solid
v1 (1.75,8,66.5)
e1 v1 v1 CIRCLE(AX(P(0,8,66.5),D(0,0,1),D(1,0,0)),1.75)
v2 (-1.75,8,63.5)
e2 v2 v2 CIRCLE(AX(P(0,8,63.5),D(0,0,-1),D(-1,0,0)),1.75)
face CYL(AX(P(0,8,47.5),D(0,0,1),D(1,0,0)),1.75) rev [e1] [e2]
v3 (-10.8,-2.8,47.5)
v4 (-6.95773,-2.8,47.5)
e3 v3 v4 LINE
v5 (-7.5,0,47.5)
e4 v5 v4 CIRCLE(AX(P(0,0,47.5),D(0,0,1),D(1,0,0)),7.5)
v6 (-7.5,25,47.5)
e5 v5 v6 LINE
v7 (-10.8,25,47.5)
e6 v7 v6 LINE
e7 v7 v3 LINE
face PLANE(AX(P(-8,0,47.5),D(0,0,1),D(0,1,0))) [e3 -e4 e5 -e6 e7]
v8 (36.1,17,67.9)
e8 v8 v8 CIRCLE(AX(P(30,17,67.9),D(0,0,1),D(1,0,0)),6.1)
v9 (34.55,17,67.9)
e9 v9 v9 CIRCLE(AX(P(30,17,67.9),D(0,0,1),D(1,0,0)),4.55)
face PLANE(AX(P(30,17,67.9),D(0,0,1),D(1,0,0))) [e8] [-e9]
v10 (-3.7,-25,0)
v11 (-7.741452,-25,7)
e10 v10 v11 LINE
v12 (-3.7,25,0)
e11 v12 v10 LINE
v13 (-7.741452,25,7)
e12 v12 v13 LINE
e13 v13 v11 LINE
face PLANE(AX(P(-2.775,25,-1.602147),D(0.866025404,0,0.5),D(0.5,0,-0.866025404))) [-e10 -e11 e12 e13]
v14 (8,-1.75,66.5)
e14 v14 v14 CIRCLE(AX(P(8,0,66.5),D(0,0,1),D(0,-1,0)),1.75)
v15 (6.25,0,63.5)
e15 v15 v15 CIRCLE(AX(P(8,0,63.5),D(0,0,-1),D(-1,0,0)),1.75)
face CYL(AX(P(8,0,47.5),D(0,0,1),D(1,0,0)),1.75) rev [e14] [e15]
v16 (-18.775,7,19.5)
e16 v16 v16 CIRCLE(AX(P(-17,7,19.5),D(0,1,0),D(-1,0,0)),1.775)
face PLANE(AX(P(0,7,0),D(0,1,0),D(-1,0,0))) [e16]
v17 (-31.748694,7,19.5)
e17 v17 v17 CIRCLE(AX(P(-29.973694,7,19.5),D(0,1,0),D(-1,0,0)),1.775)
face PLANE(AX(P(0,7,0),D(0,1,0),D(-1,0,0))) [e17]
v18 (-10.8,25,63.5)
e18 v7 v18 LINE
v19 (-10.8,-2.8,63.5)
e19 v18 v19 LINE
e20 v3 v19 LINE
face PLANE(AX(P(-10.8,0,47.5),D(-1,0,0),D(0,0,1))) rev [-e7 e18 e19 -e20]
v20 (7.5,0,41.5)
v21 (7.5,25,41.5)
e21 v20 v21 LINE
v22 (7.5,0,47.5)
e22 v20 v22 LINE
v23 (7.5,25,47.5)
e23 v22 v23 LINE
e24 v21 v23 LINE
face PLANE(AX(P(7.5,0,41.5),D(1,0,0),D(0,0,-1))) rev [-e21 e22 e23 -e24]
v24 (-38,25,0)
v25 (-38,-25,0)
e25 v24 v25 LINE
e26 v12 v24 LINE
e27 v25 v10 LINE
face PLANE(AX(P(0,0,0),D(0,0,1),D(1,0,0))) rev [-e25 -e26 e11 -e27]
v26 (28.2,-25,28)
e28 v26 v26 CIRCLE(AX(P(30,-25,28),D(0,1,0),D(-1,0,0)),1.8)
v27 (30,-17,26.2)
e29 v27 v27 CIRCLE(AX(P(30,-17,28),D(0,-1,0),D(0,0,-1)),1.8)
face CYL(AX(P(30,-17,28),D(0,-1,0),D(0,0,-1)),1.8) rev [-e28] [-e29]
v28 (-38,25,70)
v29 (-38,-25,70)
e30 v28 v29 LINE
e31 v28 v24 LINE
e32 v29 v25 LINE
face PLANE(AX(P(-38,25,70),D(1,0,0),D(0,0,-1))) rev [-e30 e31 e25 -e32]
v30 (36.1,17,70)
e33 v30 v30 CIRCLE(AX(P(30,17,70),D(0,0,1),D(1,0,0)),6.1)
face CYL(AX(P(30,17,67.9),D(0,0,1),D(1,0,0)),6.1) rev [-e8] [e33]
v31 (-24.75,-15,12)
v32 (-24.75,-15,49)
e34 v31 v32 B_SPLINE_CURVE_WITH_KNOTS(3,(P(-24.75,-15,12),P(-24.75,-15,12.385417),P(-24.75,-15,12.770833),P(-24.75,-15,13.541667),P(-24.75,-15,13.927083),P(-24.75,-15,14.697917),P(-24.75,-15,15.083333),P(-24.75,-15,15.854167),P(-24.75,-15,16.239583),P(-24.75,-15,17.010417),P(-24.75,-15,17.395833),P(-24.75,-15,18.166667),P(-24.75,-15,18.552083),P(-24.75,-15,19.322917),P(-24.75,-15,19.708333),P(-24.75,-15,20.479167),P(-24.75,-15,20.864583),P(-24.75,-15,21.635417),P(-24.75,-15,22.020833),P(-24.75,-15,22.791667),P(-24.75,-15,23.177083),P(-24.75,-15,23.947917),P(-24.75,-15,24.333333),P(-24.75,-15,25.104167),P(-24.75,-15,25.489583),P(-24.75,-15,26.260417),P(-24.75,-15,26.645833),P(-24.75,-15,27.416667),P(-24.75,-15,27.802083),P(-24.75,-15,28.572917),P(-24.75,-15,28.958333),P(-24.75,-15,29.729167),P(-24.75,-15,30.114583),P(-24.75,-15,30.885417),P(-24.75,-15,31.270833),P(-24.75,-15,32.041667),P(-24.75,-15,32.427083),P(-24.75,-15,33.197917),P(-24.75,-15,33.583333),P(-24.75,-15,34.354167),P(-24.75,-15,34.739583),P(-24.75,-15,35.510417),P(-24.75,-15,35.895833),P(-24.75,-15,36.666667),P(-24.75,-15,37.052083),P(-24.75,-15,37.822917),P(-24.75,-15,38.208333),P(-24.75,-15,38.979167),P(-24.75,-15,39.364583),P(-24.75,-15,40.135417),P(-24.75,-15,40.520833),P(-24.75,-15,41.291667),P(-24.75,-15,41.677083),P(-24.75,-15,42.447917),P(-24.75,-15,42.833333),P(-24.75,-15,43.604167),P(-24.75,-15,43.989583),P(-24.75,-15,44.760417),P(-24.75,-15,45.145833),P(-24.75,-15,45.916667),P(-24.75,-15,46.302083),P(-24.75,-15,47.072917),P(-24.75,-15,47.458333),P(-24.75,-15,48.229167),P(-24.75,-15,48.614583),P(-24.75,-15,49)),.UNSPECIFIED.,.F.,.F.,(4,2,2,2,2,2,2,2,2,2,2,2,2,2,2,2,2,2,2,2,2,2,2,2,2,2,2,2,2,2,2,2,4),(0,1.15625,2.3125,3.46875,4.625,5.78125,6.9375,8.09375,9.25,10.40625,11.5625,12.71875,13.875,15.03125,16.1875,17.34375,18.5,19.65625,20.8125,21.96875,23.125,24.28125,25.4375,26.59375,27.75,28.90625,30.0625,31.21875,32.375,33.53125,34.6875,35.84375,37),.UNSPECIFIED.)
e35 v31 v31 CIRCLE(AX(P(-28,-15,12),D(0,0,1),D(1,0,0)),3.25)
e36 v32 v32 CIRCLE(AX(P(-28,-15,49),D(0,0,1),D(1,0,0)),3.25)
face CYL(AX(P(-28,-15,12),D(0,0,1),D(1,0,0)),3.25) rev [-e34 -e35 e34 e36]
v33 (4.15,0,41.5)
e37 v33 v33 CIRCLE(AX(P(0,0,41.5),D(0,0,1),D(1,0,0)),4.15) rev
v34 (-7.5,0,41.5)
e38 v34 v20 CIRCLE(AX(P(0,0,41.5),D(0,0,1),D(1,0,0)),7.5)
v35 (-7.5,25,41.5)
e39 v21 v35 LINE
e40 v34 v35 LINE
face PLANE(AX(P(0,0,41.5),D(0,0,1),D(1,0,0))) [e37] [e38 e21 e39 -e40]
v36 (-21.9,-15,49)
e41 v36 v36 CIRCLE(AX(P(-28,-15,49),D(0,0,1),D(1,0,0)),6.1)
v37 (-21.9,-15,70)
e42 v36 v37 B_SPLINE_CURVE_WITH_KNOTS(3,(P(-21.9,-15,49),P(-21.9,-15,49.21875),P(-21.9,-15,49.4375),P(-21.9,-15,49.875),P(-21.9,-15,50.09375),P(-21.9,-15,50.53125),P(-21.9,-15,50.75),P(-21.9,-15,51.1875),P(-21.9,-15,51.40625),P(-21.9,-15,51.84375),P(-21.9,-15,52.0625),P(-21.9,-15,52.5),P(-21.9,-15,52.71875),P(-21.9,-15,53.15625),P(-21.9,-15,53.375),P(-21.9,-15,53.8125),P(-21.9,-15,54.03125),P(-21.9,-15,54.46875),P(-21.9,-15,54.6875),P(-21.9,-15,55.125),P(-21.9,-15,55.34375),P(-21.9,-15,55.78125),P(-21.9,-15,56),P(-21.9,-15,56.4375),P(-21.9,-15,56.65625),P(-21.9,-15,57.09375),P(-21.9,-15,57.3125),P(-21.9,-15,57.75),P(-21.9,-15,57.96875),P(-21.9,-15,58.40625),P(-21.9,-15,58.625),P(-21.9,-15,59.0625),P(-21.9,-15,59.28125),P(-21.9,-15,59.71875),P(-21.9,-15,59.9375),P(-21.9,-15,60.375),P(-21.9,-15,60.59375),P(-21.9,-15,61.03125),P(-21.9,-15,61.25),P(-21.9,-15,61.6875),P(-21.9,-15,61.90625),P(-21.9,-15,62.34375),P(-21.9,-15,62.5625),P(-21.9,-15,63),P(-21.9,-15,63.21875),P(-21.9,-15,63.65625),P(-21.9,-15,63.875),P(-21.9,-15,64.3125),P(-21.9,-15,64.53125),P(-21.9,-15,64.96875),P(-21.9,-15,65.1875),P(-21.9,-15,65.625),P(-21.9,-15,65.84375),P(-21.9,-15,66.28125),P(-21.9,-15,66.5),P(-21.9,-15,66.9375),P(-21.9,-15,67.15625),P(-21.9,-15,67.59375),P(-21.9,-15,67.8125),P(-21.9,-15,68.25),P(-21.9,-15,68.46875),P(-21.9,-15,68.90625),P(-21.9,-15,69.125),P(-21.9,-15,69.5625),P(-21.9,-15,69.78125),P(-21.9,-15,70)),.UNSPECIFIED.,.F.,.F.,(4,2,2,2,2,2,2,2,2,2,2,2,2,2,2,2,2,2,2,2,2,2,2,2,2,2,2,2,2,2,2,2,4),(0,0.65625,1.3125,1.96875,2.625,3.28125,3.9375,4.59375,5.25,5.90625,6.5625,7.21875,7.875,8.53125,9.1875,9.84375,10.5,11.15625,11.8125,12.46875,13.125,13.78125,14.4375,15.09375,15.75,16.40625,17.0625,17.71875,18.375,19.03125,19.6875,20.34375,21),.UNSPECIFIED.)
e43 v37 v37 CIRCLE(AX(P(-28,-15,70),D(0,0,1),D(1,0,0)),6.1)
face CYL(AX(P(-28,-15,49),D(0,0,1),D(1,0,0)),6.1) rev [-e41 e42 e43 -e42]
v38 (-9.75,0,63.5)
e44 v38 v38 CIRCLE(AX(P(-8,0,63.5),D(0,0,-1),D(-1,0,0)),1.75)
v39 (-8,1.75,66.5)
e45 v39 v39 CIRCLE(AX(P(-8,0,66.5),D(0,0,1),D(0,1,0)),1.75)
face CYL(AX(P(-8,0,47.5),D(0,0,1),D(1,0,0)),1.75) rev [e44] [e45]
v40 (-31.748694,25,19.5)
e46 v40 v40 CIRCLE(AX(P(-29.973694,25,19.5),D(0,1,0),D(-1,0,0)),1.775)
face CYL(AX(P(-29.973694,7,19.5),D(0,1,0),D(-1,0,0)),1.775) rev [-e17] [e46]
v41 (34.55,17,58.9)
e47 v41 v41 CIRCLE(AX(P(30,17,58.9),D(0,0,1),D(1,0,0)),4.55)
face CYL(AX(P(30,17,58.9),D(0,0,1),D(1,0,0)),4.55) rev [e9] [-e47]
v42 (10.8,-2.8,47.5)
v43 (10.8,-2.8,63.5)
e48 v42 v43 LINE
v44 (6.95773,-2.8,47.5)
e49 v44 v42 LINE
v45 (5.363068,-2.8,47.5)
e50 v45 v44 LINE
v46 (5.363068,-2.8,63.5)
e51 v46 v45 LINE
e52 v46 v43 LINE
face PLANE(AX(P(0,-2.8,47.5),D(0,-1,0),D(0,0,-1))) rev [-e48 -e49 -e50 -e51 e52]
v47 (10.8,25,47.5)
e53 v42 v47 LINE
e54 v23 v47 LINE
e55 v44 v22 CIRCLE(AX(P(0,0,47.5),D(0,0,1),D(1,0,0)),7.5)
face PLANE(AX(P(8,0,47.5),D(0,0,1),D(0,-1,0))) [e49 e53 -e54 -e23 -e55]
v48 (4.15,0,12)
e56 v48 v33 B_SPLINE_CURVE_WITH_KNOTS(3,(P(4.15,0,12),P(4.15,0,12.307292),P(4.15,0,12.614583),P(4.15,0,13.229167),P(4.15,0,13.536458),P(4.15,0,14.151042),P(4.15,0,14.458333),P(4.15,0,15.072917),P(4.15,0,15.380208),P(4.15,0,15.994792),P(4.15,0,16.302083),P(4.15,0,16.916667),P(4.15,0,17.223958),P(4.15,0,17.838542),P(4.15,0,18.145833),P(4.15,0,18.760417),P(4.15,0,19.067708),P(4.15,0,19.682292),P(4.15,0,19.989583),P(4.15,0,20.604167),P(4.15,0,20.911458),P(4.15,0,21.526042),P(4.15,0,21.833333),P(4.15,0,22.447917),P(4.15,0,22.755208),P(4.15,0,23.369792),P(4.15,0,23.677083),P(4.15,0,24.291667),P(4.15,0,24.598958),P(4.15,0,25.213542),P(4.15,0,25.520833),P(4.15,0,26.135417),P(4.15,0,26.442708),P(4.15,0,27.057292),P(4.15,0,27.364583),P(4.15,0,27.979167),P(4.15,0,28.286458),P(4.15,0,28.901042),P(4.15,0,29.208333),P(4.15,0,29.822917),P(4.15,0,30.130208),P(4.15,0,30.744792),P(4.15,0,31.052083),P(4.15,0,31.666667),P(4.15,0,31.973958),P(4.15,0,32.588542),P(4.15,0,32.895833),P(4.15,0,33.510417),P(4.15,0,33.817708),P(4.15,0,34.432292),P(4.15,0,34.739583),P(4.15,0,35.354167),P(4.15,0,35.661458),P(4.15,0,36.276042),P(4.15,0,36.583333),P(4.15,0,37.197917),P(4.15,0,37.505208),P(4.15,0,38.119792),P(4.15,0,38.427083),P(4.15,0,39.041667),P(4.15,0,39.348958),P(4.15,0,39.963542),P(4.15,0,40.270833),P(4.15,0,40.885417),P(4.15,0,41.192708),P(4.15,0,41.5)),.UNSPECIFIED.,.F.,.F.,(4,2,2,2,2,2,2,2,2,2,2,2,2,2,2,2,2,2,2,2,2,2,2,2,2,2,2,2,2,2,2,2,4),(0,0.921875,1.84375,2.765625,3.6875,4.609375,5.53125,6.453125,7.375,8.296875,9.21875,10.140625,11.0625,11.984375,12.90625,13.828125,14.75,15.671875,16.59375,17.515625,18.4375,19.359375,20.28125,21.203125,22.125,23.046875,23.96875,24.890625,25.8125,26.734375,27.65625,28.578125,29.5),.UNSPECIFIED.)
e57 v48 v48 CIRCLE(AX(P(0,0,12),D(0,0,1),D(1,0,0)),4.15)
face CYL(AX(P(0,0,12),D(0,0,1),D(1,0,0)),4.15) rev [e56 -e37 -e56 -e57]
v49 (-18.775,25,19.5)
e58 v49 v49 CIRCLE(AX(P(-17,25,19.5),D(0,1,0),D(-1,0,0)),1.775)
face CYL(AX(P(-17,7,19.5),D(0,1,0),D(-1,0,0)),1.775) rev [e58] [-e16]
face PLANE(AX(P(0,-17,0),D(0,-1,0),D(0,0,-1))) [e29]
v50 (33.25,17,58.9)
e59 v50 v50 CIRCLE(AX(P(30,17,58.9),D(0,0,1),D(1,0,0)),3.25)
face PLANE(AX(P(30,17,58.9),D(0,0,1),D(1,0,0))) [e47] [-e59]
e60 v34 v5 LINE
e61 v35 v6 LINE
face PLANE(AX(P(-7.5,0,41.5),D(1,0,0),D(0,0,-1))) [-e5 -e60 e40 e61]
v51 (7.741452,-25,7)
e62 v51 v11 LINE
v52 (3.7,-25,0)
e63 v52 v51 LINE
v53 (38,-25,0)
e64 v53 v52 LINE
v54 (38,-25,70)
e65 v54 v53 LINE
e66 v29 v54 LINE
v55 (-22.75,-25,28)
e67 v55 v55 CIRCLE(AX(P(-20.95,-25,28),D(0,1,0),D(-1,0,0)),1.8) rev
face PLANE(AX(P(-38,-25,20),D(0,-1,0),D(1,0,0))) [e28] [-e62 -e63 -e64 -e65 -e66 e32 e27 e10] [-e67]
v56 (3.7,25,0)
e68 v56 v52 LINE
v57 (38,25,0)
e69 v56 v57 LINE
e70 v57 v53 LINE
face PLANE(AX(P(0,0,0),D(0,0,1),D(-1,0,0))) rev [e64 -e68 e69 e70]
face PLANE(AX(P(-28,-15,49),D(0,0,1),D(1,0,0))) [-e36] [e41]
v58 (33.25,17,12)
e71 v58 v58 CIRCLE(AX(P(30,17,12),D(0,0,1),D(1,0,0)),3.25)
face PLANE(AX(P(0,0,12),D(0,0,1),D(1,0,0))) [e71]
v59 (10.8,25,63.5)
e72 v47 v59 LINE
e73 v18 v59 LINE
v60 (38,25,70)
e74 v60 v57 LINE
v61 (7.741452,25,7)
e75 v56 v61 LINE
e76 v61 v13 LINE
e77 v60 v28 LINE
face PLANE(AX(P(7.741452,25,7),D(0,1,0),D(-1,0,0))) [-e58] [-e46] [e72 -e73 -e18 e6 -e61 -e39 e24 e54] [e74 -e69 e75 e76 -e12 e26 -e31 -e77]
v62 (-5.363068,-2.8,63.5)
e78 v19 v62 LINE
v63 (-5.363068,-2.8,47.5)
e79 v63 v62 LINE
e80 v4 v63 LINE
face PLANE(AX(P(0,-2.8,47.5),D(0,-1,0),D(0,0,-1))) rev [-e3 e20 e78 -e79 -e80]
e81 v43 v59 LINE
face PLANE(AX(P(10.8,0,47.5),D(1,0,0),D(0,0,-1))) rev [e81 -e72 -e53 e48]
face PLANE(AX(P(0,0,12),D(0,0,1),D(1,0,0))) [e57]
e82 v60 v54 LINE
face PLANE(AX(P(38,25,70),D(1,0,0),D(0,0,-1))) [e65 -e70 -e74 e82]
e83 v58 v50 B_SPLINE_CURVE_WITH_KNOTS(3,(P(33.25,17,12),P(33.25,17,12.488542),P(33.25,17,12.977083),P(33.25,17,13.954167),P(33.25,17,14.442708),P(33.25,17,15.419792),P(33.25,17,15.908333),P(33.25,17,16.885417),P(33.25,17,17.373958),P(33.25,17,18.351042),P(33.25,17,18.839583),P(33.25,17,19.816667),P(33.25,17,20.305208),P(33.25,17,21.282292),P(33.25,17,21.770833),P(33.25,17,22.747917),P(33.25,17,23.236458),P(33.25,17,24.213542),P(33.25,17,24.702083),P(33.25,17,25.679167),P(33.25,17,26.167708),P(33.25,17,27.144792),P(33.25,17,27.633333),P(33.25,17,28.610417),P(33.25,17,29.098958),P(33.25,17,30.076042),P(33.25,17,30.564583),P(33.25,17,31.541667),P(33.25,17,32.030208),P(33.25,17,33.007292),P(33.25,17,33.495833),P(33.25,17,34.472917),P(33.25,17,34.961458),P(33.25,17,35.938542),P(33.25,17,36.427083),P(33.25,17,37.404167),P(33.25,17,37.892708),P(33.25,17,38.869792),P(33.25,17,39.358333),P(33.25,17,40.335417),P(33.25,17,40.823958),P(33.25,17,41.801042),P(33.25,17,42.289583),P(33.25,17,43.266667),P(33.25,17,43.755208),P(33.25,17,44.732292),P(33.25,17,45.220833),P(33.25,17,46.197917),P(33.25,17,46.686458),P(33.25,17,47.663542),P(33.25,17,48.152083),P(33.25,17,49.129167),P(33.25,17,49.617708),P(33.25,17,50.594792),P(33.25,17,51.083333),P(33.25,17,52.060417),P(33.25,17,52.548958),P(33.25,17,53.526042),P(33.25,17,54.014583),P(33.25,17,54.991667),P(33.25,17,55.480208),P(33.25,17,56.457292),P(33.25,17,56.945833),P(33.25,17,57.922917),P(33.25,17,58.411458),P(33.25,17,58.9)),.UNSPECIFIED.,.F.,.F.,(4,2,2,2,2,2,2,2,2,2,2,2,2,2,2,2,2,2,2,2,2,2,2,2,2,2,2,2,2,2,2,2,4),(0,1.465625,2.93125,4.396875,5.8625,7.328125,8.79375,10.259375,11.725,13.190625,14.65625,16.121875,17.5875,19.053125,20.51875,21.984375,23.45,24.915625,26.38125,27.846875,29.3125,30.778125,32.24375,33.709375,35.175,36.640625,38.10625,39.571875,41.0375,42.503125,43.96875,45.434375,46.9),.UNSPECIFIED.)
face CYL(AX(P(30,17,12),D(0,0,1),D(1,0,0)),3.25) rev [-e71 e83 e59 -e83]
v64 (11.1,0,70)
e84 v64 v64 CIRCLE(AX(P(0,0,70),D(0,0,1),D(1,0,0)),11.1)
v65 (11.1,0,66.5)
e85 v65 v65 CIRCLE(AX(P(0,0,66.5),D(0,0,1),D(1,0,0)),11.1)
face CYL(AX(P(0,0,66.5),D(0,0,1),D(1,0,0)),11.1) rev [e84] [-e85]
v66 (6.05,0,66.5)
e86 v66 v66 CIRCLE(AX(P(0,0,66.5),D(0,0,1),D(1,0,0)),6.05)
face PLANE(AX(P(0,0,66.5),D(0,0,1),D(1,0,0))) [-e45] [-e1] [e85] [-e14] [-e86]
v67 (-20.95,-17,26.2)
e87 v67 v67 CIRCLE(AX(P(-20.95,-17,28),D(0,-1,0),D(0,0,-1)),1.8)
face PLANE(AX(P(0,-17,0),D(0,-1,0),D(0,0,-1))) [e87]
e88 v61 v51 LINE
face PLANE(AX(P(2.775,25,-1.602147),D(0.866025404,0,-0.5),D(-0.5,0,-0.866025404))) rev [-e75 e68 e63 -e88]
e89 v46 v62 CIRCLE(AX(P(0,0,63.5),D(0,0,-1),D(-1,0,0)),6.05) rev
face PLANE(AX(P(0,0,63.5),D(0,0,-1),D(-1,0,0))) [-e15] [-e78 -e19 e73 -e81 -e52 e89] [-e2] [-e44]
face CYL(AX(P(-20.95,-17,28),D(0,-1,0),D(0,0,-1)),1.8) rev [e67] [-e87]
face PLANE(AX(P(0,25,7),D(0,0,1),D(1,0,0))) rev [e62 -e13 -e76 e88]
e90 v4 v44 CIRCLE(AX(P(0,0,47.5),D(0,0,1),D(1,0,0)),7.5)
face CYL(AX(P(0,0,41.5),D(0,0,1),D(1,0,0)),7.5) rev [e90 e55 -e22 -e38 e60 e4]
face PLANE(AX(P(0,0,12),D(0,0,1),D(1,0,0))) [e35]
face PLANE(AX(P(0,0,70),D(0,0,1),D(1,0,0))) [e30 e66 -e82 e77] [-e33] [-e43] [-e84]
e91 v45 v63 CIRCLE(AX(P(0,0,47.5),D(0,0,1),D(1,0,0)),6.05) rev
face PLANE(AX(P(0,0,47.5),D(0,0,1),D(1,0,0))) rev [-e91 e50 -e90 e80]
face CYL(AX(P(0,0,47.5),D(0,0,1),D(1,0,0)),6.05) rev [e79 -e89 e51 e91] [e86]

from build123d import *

# Parameters (mm, degrees)
SKETCH1_W                       = 38
SKETCH1_H                       = 50
BOSS_EXTRUDE1_DEPTH             = 70
CUT_EXTRUDE1_DEPTH              = 50
SKETCH8_R                       = 3.25
SKETCH8_R_2                     = 4.15
CUT_EXTRUDE7_DEPTH              = 58
SKETCH42_R                      = 6.1
SKETCH42_R_2                    = 3.25
CUT_EXTRUDE30_DEPTH             = 21
SKETCH43_R                      = 4.55
SKETCH43_R_2                    = 3.25
CUT_EXTRUDE31_DEPTH             = 11.1
SKETCH44_R                      = 6.1
SKETCH44_R_2                    = 4.55
CUT_EXTRUDE32_DEPTH             = 2.1
SKETCH10_R                      = 11.1
CUT_EXTRUDE8_DEPTH              = 3.5
SKETCH11_R                      = 6.05
CUT_EXTRUDE9_DEPTH              = 19
SKETCH12_R                      = 6.05
CUT_EXTRUDE10_DEPTH             = 6
CUT_EXTRUDE11_START             = -16
CUT_EXTRUDE11_DEPTH             = 16
SKETCH14_R                      = 1.75
CUT_EXTRUDE12_DEPTH             = 19
CIRPATTERN1_COUNT               = 2
CIRPATTERN1_ANGLE               = 90
CIRPATTERN1_THE_OTHER_WAY_COUNT = 2
CIRPATTERN1_THE_OTHER_WAY_ANGLE = 90
SKETCH15_R                      = 1.75
CUT_EXTRUDE13_DEPTH             = 16
BOSS_EXTRUDE4_DEPTH             = 12
SKETCH18_W                      = 24
SKETCH18_H                      = 19.482903768
BOSS_EXTRUDE5_DEPTH             = 30
BOSS_EXTRUDE15_DEPTH            = 4.73424
BOSS_EXTRUDE15_START            = -38
BOSS_EXTRUDE15_2_DEPTH          = 7.26576
BOSS_EXTRUDE15_START_2          = -63.25
BOSS_EXTRUDE15_3_DEPTH          = 38.25
BOSS_EXTRUDE6_DEPTH             = 12
SKETCH20_W                      = 12
SKETCH20_H                      = 19.482903768
BOSS_EXTRUDE7_DEPTH             = 36
SKETCH22_W                      = 8
SKETCH22_H                      = 10
SKETCH22_R                      = 2.4
BOSS_EXTRUDE8_DEPTH             = 7
SKETCH37_R                      = 2.4
CUT_EXTRUDE25_DEPTH             = 2.1
BOSS_EXTRUDE9_DEPTH             = 9
SKETCH25_R                      = 2
CUT_EXTRUDE15_DEPTH             = 10
BOSS_EXTRUDE10_DEPTH            = 8.5
BOSS_EXTRUDE10_2_DEPTH          = 8.5
SKETCH27_R                      = 1.75
CUT_EXTRUDE16_DEPTH             = 10
CUT_EXTRUDE17_DEPTH             = 8.5
BOSS_EXTRUDE11_DEPTH            = 7
SKETCH30_W                      = 5
SKETCH30_H                      = 29.277350269
BOSS_EXTRUDE12_DEPTH            = 38
SKETCH31_R                      = 2.5
BOSS_EXTRUDE13_DEPTH            = 6
BOSS_EXTRUDE14_DEPTH            = 1
SKETCH33_R                      = 1.75
CUT_EXTRUDE21_DEPTH             = 12
SKETCH34_R                      = 7
CUT_EXTRUDE22_DEPTH             = 1
SKETCH35_RX                     = 2
SKETCH35_RY                     = 0.5
CUT_EXTRUDE23_DEPTH             = 5
SKETCH36_R                      = 2.9
CUT_EXTRUDE24_DEPTH             = 3.8
CUT_EXTRUDE26_DEPTH             = 2
SKETCH39_R                      = 1.775
CUT_EXTRUDE27_DEPTH             = 18
CUT_EXTRUDE28_DEPTH             = 96
CUT_EXTRUDE29_DEPTH             = 26.777350269
SKETCH45_R                      = 1.8
CUT_EXTRUDE33_DEPTH             = 10
CUT_EXTRUDE35_DEPTH             = 2
SKETCH53_W                      = 10
SKETCH53_H                      = 21
CUT_EXTRUDE37_DEPTH             = 19.482903769
SKETCH51_W                      = 69.339188828
SKETCH51_H                      = 40.209452119
CUT_EXTRUDE36_DEPTH             = 76


with BuildPart() as part:
    # Sketch1 → Boss-Extrude1 (new body)
    with BuildSketch(Plane.XY):
        with Locations((-19, 0)):
            Rectangle(SKETCH1_W, SKETCH1_H)
    boss_extrude1 = extrude(amount=BOSS_EXTRUDE1_DEPTH)

    # Sketch2 → Cut-Extrude1 (cut)
    with BuildSketch(Plane(origin=(-20, -25, 0), x_dir=(0, 0, -1), z_dir=(0, 1, 0))):
        Polygon((0, -20), (0, -16.3), (-7, -12.258548116), (-7, -20), align=None)
    cut_extrude1 = extrude(amount=CUT_EXTRUDE1_DEPTH, mode=Mode.SUBTRACT)

    # Mirror1: Boss-Extrude1, Cut-Extrude1 across plane
    add(boss_extrude1.mirror(Plane(origin=(0, 0, 0), x_dir=(0, 0, 1), z_dir=(1, 0, 0))))
    add(cut_extrude1.mirror(Plane(origin=(0, 0, 0), x_dir=(0, 0, 1), z_dir=(1, 0, 0))), mode=Mode.SUBTRACT)

    # Sketch8 → Cut-Extrude7 (cut)
    with BuildSketch(Plane.XY.offset(70)):
        with Locations((-28, -15)):
            Circle(SKETCH8_R)
        Circle(SKETCH8_R_2)
        with Locations((30, 17)):
            Circle(SKETCH8_R)
    extrude(amount=-CUT_EXTRUDE7_DEPTH, mode=Mode.SUBTRACT)

    # Sketch42 → Cut-Extrude30 (cut)
    with BuildSketch(Plane.XY.offset(70)):
        with Locations((-28, -15)):
            Circle(SKETCH42_R)
        with Locations((-28, -15)):
            Circle(SKETCH42_R_2, mode=Mode.SUBTRACT)
    extrude(amount=-CUT_EXTRUDE30_DEPTH, mode=Mode.SUBTRACT)

    # Sketch43 → Cut-Extrude31 (cut)
    with BuildSketch(Plane.XY.offset(70)):
        with Locations((30, 17)):
            Circle(SKETCH43_R)
        with Locations((30, 17)):
            Circle(SKETCH43_R_2, mode=Mode.SUBTRACT)
    extrude(amount=-CUT_EXTRUDE31_DEPTH, mode=Mode.SUBTRACT)

    # Sketch44 → Cut-Extrude32 (cut)
    with BuildSketch(Plane.XY.offset(70)):
        with Locations((30, 17)):
            Circle(SKETCH44_R)
        with Locations((30, 17)):
            Circle(SKETCH44_R_2, mode=Mode.SUBTRACT)
    extrude(amount=-CUT_EXTRUDE32_DEPTH, mode=Mode.SUBTRACT)

    # Sketch10 → Cut-Extrude8 (cut)
    with BuildSketch(Plane.XY.offset(70)):
        Circle(SKETCH10_R)
    extrude(amount=-CUT_EXTRUDE8_DEPTH, mode=Mode.SUBTRACT)

    # Sketch11 → Cut-Extrude9 (cut)
    with BuildSketch(Plane.XY.offset(66.5)):
        Circle(SKETCH11_R)
    extrude(amount=-CUT_EXTRUDE9_DEPTH, mode=Mode.SUBTRACT)

    # Sketch12 → Cut-Extrude10 (cut)
    # profile 1 of 2: a face of its own
    with BuildSketch(Plane.XY.offset(47.5)):
        with BuildLine():
            Line((7.5, 0), (7.5, 25))
            Line((7.5, 25), (-7.5, 25))
            Line((-7.5, 25), (-7.5, 0))
            ThreePointArc((-7.5, 0), (0, -7.5), (7.5, 0))
        make_face()
        Circle(SKETCH12_R, mode=Mode.SUBTRACT)
    # profile 2 of 2: a face of its own
    with BuildSketch(Plane.XY.offset(47.5)):
        Circle(SKETCH12_R)
    extrude(amount=-CUT_EXTRUDE10_DEPTH, mode=Mode.SUBTRACT)

    # Sketch13 → Cut-Extrude11 (cut)
    with BuildSketch(Plane(origin=(0, 0, 47.5), x_dir=(-1, 0, 0), z_dir=(0, 0, -1)).offset(CUT_EXTRUDE11_START)):
        with BuildLine():
            Line((-6.05, 25), (-6.05, 0))
            ThreePointArc((-6.05, 0), (0, 6.05), (6.05, 0))
            Line((6.05, 0), (6.05, 25))
            Line((6.05, 25), (-6.05, 25))
        make_face()
    extrude(amount=CUT_EXTRUDE11_DEPTH, mode=Mode.SUBTRACT)

    # Sketch14 → Cut-Extrude12 (cut)
    with BuildSketch(Plane.XY.offset(66.5)):
        with Locations((0, 8)):
            Circle(SKETCH14_R)
    cut_extrude12 = extrude(amount=-CUT_EXTRUDE12_DEPTH, mode=Mode.SUBTRACT)

    # CirPattern1: Cut-Extrude12 ×2 about axis
    cirpattern1_axis = Axis((0, 0, 12), (0, 0, 1))
    for i in range(1, CIRPATTERN1_COUNT):
        add(cut_extrude12.rotate(cirpattern1_axis, i * CIRPATTERN1_ANGLE / (CIRPATTERN1_COUNT - 1)), mode=Mode.SUBTRACT)

    # CirPattern1 the other way: Cut-Extrude12 ×2 about axis
    cirpattern1_the_other_way_axis = Axis((0, 0, 12), (0, 0, -1))
    for i in range(1, CIRPATTERN1_THE_OTHER_WAY_COUNT):
        add(cut_extrude12.rotate(cirpattern1_the_other_way_axis, i * CIRPATTERN1_THE_OTHER_WAY_ANGLE / (CIRPATTERN1_THE_OTHER_WAY_COUNT - 1)), mode=Mode.SUBTRACT)

    # Sketch15 → Cut-Extrude13 (cut)
    # profile 1 of 2: a face of its own
    with BuildSketch(Plane(origin=(0, 0, 63.5), x_dir=(-1, 0, 0), z_dir=(0, 0, -1))):
        with BuildLine():
            Line((-6.05, 25), (-6.05, 0))
            ThreePointArc((-6.05, 0), (0, 6.05), (6.05, 0))
            Line((6.05, 0), (6.05, 25))
            Line((6.05, 25), (-6.05, 25))
        make_face()
        with Locations(Location((0, 8, 0), (0, 0, 180))):
            Circle(SKETCH15_R, mode=Mode.SUBTRACT)
    # profile 2 of 2: a face of its own
    with BuildSketch(Plane(origin=(0, 0, 63.5), x_dir=(-1, 0, 0), z_dir=(0, 0, -1))):
        with BuildLine():
            Line((-10.8, 25), (-10.8, -2.8))
            Line((-10.8, -2.8), (10.8, -2.8))
            Line((10.8, -2.8), (10.8, 25))
            Line((10.8, 25), (6.05, 25))
            Line((6.05, 25), (6.05, 0))
            ThreePointArc((6.05, 0), (0, 6.05), (-6.05, 0))
            Line((-6.05, 0), (-6.05, 25))
            Line((-6.05, 25), (-10.8, 25))
        make_face()
        with Locations(Location((-8, 0, 0), (0, 0, 270))):
            Circle(SKETCH15_R, mode=Mode.SUBTRACT)
        with Locations(Location((8, 0, 0), (0, 0, 90))):
            Circle(SKETCH15_R, mode=Mode.SUBTRACT)
    extrude(amount=CUT_EXTRUDE13_DEPTH, mode=Mode.SUBTRACT)

    # Sketch17 → Boss-Extrude4 (add)
    with BuildSketch(Plane.ZY.offset(26)):
        Polygon((42.083647797, -25), (20, -63.25), (20, -25), align=None)
        Polygon((38.619546181, -27), (22, -55.785898385), (22, -27), align=None, mode=Mode.SUBTRACT)
    extrude(amount=-BOSS_EXTRUDE4_DEPTH)

    # Sketch18 → Boss-Extrude5 (add)
    with BuildSketch(Plane(origin=(0, 0, 20), x_dir=(-1, 0, 0), z_dir=(0, 0, -1))):
        with Locations((26, -42.08)):
            Rectangle(SKETCH18_W, SKETCH18_H)
        Polygon((37.2, -49.821451884), (30.2, -45.78), (30.2, -38.38), (37.2, -34.338548116), align=None, mode=Mode.SUBTRACT)
    extrude(amount=BOSS_EXTRUDE5_DEPTH)

    # Boss-Extrude15: read off the stored shape, not the designer's step
    # Boss-Extrude15 outline → Boss-Extrude15 (add)
    with BuildSketch(Plane.ZY.offset(26)):
        Polygon((20, -25), (20, -63.25), (42.083647797, -25), align=None)
        Polygon((38.619546181, -27), (22, -55.785898385), (22, -27), align=None, mode=Mode.SUBTRACT)
    extrude(amount=BOSS_EXTRUDE15_DEPTH)

    # Boss-Extrude15 2 outline → Boss-Extrude15 2 (add)
    with BuildSketch(Plane.YZ.offset(BOSS_EXTRUDE15_START)):
        Polygon((-63.25, 20), (-25, 20), (-25, 42.083647797), align=None)
        Polygon((-27, 38.619546181), (-27, 22), (-55.785898385, 22), align=None, mode=Mode.SUBTRACT)
    extrude(amount=BOSS_EXTRUDE15_2_DEPTH)

    # Boss-Extrude15 3 outline → Boss-Extrude15 3 (cut)
    with BuildSketch(Plane(origin=(0, 0, 0), x_dir=(1, 0, 0), z_dir=(0, 1, 0)).offset(BOSS_EXTRUDE15_START_2)):
        Polygon((-26, -42.083647797), (-38, -20), (-39, -18.159696017), (-39, -44), (-24.958676273, -44), align=None)
    extrude(amount=BOSS_EXTRUDE15_3_DEPTH, mode=Mode.SUBTRACT)

    # Sketch19 → Boss-Extrude6 (add)
    with BuildSketch(Plane(origin=(36, 0, 0), x_dir=(0, 0, -1), z_dir=(1, 0, 0))):
        Polygon((-20, -25), (-42.083647797, -25), (-20, -63.25), align=None)
        Polygon((-22, -27), (-22, -55.785898385), (-38.619546181, -27), align=None, mode=Mode.SUBTRACT)
    extrude(amount=-BOSS_EXTRUDE6_DEPTH)

    # Sketch20 → Boss-Extrude7 (add)
    with BuildSketch(Plane(origin=(0, 0, 20), x_dir=(-1, 0, 0), z_dir=(0, 0, -1))):
        with Locations((-30, -42.08)):
            Rectangle(SKETCH20_W, SKETCH20_H)
        Polygon((-33, -49.621451884), (-33, -34.538548116), (-26, -38.58), (-26, -45.58), align=None, mode=Mode.SUBTRACT)
    extrude(amount=BOSS_EXTRUDE7_DEPTH)

    # Sketch22 → Boss-Extrude8 (add)
    with BuildSketch(Plane(origin=(0, 0, -16), x_dir=(-1, 0, 0), z_dir=(0, 0, -1))):
        with Locations((-20, -42.08)):
            Rectangle(SKETCH22_W, SKETCH22_H)
        with Locations(Location((-20, -42.08, 0), (0, 0, 90))):
            Circle(SKETCH22_R, mode=Mode.SUBTRACT)
    extrude(amount=-BOSS_EXTRUDE8_DEPTH)

    # Sketch37 → Cut-Extrude25 (cut)
    with BuildSketch(Plane(origin=(0, 0, -16), x_dir=(-1, 0, 0), z_dir=(0, 0, -1))):
        Polygon((-18.166912895, -38.905), (-21.833087105, -38.905), (-23.666174209, -42.08), (-21.833087105, -45.255), (-18.166912895, -45.255), (-16.333825791, -42.08), align=None)
        with Locations(Location((-20, -42.08, 0), (0, 0, 90))):
            Circle(SKETCH37_R, mode=Mode.SUBTRACT)
    extrude(amount=-CUT_EXTRUDE25_DEPTH, mode=Mode.SUBTRACT)

    # Sketch24 → Boss-Extrude9 (add)
    with BuildSketch(Plane.ZY.offset(21.5)):
        Polygon((8.5, 55), (8.5, 25), (47, 25), (8.5, 63.5), (1.5, 63.5), (1.5, 55), align=None)
        Polygon((10.5, 27), (10.5, 58.671572875), (42.171572875, 27), align=None, mode=Mode.SUBTRACT)
    extrude(amount=-BOSS_EXTRUDE9_DEPTH)

    # Sketch25 → Cut-Extrude15 (cut)
    with BuildSketch(Plane.XZ.offset(-55)):
        with Locations(Location((-17, 5, 0), (0, 0, 270))):
            Circle(SKETCH25_R)
    extrude(amount=-CUT_EXTRUDE15_DEPTH, mode=Mode.SUBTRACT)

    # Sketch26<3> → Cut-Extrude17 (cut)
    with BuildSketch(Plane(origin=(0, 63.5, 0), x_dir=(1, 0, 0), z_dir=(0, 1, 0))):
        with BuildLine():
            Line((-14.103420078, -1.5), (-19.896579922, -1.5))
            ThreePointArc((-19.896579922, -1.5), (-17, -1.802926416), (-14.103420078, -1.5))
        make_face()
    extrude(amount=-CUT_EXTRUDE17_DEPTH, mode=Mode.SUBTRACT)



with BuildPart() as body_2:
    # Sketch26 → Boss-Extrude10 (new body)
    with BuildSketch(Plane(origin=(0, 63.5, 0), x_dir=(1, 0, 0), z_dir=(0, 1, 0))):
        with BuildLine():
            ThreePointArc((-22.075186591, 27.67257884), (-30.311604201, 21.897780646), (-33.473693864, 12.348536792))
            Line((-33.473693864, 12.348536792), (-33.473693864, -8.5))
            Line((-33.473693864, -8.5), (-26.473693864, -8.5))
            Line((-26.473693864, -8.5), (-26.473693864, -0.880219764))
            Line((-26.473693864, -0.880219764), (-21.5, -8.5))
            Line((-21.5, -8.5), (-21.5, -6.670498963))
            Line((-21.5, -6.670498963), (-24.546408047, -2.003352076))
            ThreePointArc((-24.546408047, -2.003352076), (-23.331001026, -2.540786658), (-22.075186591, -2.975505256))
            Line((-22.075186591, -2.975505256), (-21.5, -3.148221887))
            Line((-21.5, -3.148221887), (-21.5, -1.5))
            Line((-21.5, -1.5), (-19.896579922, -1.5))
            ThreePointArc((-19.896579922, -1.5), (-20.704827747, -1.303824585), (-21.5, -1.06))
            ThreePointArc((-21.5, -1.06), (-31.473693864, 12.348536792), (-21.5, 25.757073584))
            ThreePointArc((-21.5, 25.757073584), (-17, 26.5), (-12.5, 25.757073584))
            Line((-12.5, 25.757073584), (-12.5, 33.757073584))
            Line((-12.5, 33.757073584), (-21.5, 33.757073584))
            Line((-21.5, 33.757073584), (-21.5, 27.84529547))
            Line((-21.5, 27.84529547), (-22.075186591, 27.67257884))
        make_face()
    extrude(amount=-BOSS_EXTRUDE10_DEPTH)

    # Sketch27 → Cut-Extrude16 (cut)
    with BuildSketch(Plane(origin=(0, 63.5, 0), x_dir=(1, 0, 0), z_dir=(0, 1, 0))):
        with Locations((-17, 30)):
            Circle(SKETCH27_R)
        with BuildLine():
            Line((-17, 31.75), (-18.5, 31.75))
            ThreePointArc((-18.5, 31.75), (-20.25, 30), (-18.5, 28.25))
            Line((-18.5, 28.25), (-17, 28.25))
            ThreePointArc((-17, 28.25), (-18.75, 30), (-17, 31.75))
        make_face()
        with BuildLine():
            Line((-15.5, 31.75), (-17, 31.75))
            ThreePointArc((-17, 31.75), (-15.762563133, 31.237436867), (-15.25, 30))
            ThreePointArc((-15.25, 30), (-15.762563133, 28.762563133), (-17, 28.25))
            Line((-17, 28.25), (-15.5, 28.25))
            ThreePointArc((-15.5, 28.25), (-13.75, 30), (-15.5, 31.75))
        make_face()
    extrude(amount=-CUT_EXTRUDE16_DEPTH, mode=Mode.SUBTRACT)


with BuildPart() as body_3:
    # Sketch26 → Boss-Extrude10 2 (new body)
    with BuildSketch(Plane(origin=(0, 63.5, 0), x_dir=(1, 0, 0), z_dir=(0, 1, 0))):
        with BuildLine():
            ThreePointArc((-12.5, -1.06), (-13.295172253, -1.303824585), (-14.103420078, -1.5))
            Line((-14.103420078, -1.5), (-12.5, -1.5))
            Line((-12.5, -1.5), (-12.5, -1.06))
        make_face()
    extrude(amount=-BOSS_EXTRUDE10_2_DEPTH)


with BuildPart() as part_1:
    add(part.part)

    add(body_2.part)  # Boss-Extrude11 merges body 2
    # Sketch29 → Boss-Extrude11 (add)
    with BuildSketch(Plane.ZY.offset(33.473693864)):
        Polygon((8.5, 63.5), (8.5, 55), (8.5, 25), (47, 25), align=None)
        Polygon((10.5, 55), (10.5, 58.671572875), (42.171572875, 27), (10.5, 27), align=None, mode=Mode.SUBTRACT)
    extrude(amount=-BOSS_EXTRUDE11_DEPTH)

    # Sketch30 → Boss-Extrude12 (add)
    with BuildSketch(Plane.ZY.offset(-24)):
        with Locations((19.5, -44.477223251)):
            Rectangle(SKETCH30_W, SKETCH30_H)
    extrude(amount=BOSS_EXTRUDE12_DEPTH)

    # Sketch31 → Boss-Extrude13 (add)
    with BuildSketch(Plane(origin=(0, 0, 17), x_dir=(-1, 0, 0), z_dir=(0, 0, -1))):
        with Locations(Location((-12.071067812, -35.014830573, 0), (0, 0, 180))):
            Circle(SKETCH31_R)
        with Locations(Location((2.071067812, -35.014830573, 0), (0, 0, 180))):
            Circle(SKETCH31_R)
        with Locations(Location((2.071067812, -49.156966197, 0), (0, 0, 180))):
            Circle(SKETCH31_R)
        with Locations(Location((-12.071067812, -49.156966197, 0), (0, 0, 180))):
            Circle(SKETCH31_R)
    extrude(amount=BOSS_EXTRUDE13_DEPTH)

    # Sketch32 → Boss-Extrude14 (add)
    with BuildSketch(Plane(origin=(0, 0, 11), x_dir=(-1, 0, 0), z_dir=(0, 0, -1))):
        with BuildLine():
            Line((-12.571067812, -32.514830573), (2.571067812, -32.514830573))
            ThreePointArc((2.571067812, -32.514830573), (3.985281374, -33.100617011), (4.571067812, -34.514830573))
            Line((4.571067812, -34.514830573), (4.571067812, -49.656966197))
            ThreePointArc((4.571067812, -49.656966197), (3.985281374, -51.071179759), (2.571067812, -51.656966197))
            Line((2.571067812, -51.656966197), (-12.571067812, -51.656966197))
            ThreePointArc((-12.571067812, -51.656966197), (-13.985281374, -51.071179759), (-14.571067812, -49.656966197))
            Line((-14.571067812, -49.656966197), (-14.571067812, -34.514830573))
            ThreePointArc((-14.571067812, -34.514830573), (-13.985281374, -33.100617011), (-12.571067812, -32.514830573))
        make_face()
    extrude(amount=BOSS_EXTRUDE14_DEPTH)

    # Sketch33 → Cut-Extrude21 (cut)
    with BuildSketch(Plane(origin=(0, 0, 10), x_dir=(-1, 0, 0), z_dir=(0, 0, -1))):
        with Locations((-12.071067812, -35.014830573)):
            Circle(SKETCH33_R)
        with Locations((-12.071067812, -49.156966197)):
            Circle(SKETCH33_R)
        with Locations((2.071067812, -35.014830573)):
            Circle(SKETCH33_R)
        with Locations((2.071067812, -49.156966197)):
            Circle(SKETCH33_R)
    extrude(amount=-CUT_EXTRUDE21_DEPTH, mode=Mode.SUBTRACT)

    # Sketch34 → Cut-Extrude22 (cut)
    with BuildSketch(Plane(origin=(0, 0, 10), x_dir=(-1, 0, 0), z_dir=(0, 0, -1))):
        with Locations((-5, -42.085898385)):
            Circle(SKETCH34_R)
    extrude(amount=-CUT_EXTRUDE22_DEPTH, mode=Mode.SUBTRACT)

    # Sketch35 → Cut-Extrude23 (cut)
    with BuildSketch(Plane(origin=(0, 0, 17), x_dir=(-1, 0, 0), z_dir=(0, 0, -1))):
        with Locations((-5, -42.085898385)):
            Ellipse(SKETCH35_RX, SKETCH35_RY)
    extrude(amount=-CUT_EXTRUDE23_DEPTH, mode=Mode.SUBTRACT)

    # Sketch36 → Cut-Extrude24 (cut)
    with BuildSketch(Plane(origin=(0, 0, 17), x_dir=(-1, 0, 0), z_dir=(0, 0, -1))):
        with Locations((-5, -42.085898385)):
            Circle(SKETCH36_R)
    extrude(amount=-CUT_EXTRUDE24_DEPTH, mode=Mode.SUBTRACT)

    # Sketch38 → Cut-Extrude26 (cut)
    with BuildSketch(Plane(origin=(0, 27, 0), x_dir=(1, 0, 0), z_dir=(0, 1, 0))):
        with BuildLine():
            Line((-31.723693864, -15.5), (-31.723693864, -23.5))
            ThreePointArc((-31.723693864, -23.5), (-29.973693864, -25.25), (-28.223693864, -23.5))
            Line((-28.223693864, -23.5), (-28.223693864, -15.5))
            ThreePointArc((-28.223693864, -15.5), (-29.973693864, -13.75), (-31.723693864, -15.5))
        make_face()
        with BuildLine():
            Line((-18.75, -15.5), (-18.75, -23.5))
            ThreePointArc((-18.75, -23.5), (-17, -25.25), (-15.25, -23.5))
            Line((-15.25, -23.5), (-15.25, -15.5))
            ThreePointArc((-15.25, -15.5), (-17, -13.75), (-18.75, -15.5))
        make_face()
    extrude(amount=-CUT_EXTRUDE26_DEPTH, mode=Mode.SUBTRACT)

    # Sketch39 → Cut-Extrude27 (cut)
    with BuildSketch(Plane(origin=(0, 25, 0), x_dir=(1, 0, 0), z_dir=(0, 1, 0))):
        with Locations(Location((-29.973693864, -19.5, 0), (0, 0, 180))):
            Circle(SKETCH39_R)
        with Locations(Location((-17, -19.5, 0), (0, 0, 180))):
            Circle(SKETCH39_R)
    extrude(amount=-CUT_EXTRUDE27_DEPTH, mode=Mode.SUBTRACT)


with BuildPart() as body_3_2:
    # Split1: read off the stored shape, not the designer's step
    # Split1: the piece on the far side of the plane
    add(part_1.part)
    split(bisect_by=Plane(origin=(0, 25, 0), x_dir=(1, 0, 0), z_dir=(0, 1, 0)), keep=Keep.BOTTOM)

    # Sketch41 → Cut-Extrude29 (cut)
    with BuildSketch(Plane.XZ.offset(59.115898385)):
        Polygon((-6.25571681, 17), (-5.385473361, 8.406534471), (16.679408912, 8.406534471), (16.679408912, 17), align=None)
    extrude(amount=-CUT_EXTRUDE29_DEPTH, mode=Mode.SUBTRACT)

    # Sketch45 → Cut-Extrude33 (cut)
    with BuildSketch(Plane.XZ.offset(27)):
        with Locations(Location((-20.95, 28, 0), (0, 0, 270))):
            Circle(SKETCH45_R)
        with Locations(Location((30, 28, 0), (0, 0, 270))):
            Circle(SKETCH45_R)
    extrude(amount=-CUT_EXTRUDE33_DEPTH, mode=Mode.SUBTRACT)

    # Sketch50 → Cut-Extrude35 (cut)
    with BuildSketch(Plane.XZ.offset(27)):
        with BuildLine():
            Line((-22.75, 30.5), (-22.75, 28))
            ThreePointArc((-22.75, 28), (-20.95, 29.8), (-19.15, 28))
            Line((-19.15, 28), (-19.15, 30.5))
            ThreePointArc((-19.15, 30.5), (-20.95, 32.3), (-22.75, 30.5))
        make_face()
        with BuildLine():
            Line((-22.75, 28), (-22.75, 25.5))
            ThreePointArc((-22.75, 25.5), (-20.95, 23.7), (-19.15, 25.5))
            Line((-19.15, 25.5), (-19.15, 28))
            ThreePointArc((-19.15, 28), (-20.95, 26.2), (-22.75, 28))
        make_face()
        with BuildLine():
            Line((28.2, 30.5), (28.2, 28))
            ThreePointArc((28.2, 28), (30, 29.8), (31.8, 28))
            Line((31.8, 28), (31.8, 30.5))
            ThreePointArc((31.8, 30.5), (30, 32.3), (28.2, 30.5))
        make_face()
        with BuildLine():
            Line((28.2, 28), (28.2, 25.5))
            ThreePointArc((28.2, 25.5), (30, 23.7), (31.8, 25.5))
            Line((31.8, 25.5), (31.8, 28))
            ThreePointArc((31.8, 28), (30, 26.2), (28.2, 28))
        make_face()
    extrude(amount=-CUT_EXTRUDE35_DEPTH, mode=Mode.SUBTRACT)

    # Sketch53 → Cut-Extrude37 (cut)
    with BuildSketch(Plane.XZ.offset(51.821451884)):
        with Locations((-19, 0.5)):
            Rectangle(SKETCH53_W, SKETCH53_H)
    extrude(amount=-CUT_EXTRUDE37_DEPTH, mode=Mode.SUBTRACT)


with BuildPart() as part_2:
    add(part_1.part)

    # Split1
    split(bisect_by=Plane(origin=(0, 25, 0), x_dir=(1, 0, 0), z_dir=(0, 1, 0)), keep=Keep.TOP)


with BuildPart() as cut_extrude28_tool:
    # Sketch40 → Cut-Extrude28 (new body)
    with BuildSketch(Plane.ZY.offset(38)):
        Polygon((0, 25), (-60.44299001, 25), (-60.44299001, 86.660326125), (64.099076927, 86.660326125), (63.5, 25), align=None)
    extrude(amount=-CUT_EXTRUDE28_DEPTH)


with BuildPart() as part_3:
    add(part_2.part)

    # Cut-Extrude28: cut by cut_extrude28_tool
    add(cut_extrude28_tool.part, mode=Mode.SUBTRACT)


with BuildPart() as body_3_1:
    add(body_3.part)

    # Cut-Extrude28: cut by cut_extrude28_tool
    add(cut_extrude28_tool.part, mode=Mode.SUBTRACT)


with BuildPart() as body_2_2:
    # Split3: read off the stored shape, not the designer's step
    # Split3: the piece on the far side of the plane
    add(body_3_2.part)
    split(bisect_by=Plane(origin=(0, -25, 0), x_dir=(1, 0, 0), z_dir=(0, 1, 0)), keep=Keep.BOTTOM)

    # Sketch51 → Cut-Extrude36 (cut)
    with BuildSketch(Plane(origin=(38, 0, 0), x_dir=(0, 0, -1), z_dir=(1, 0, 0))):
        with Locations((-10.97062535, -45.10472606)):
            Rectangle(SKETCH51_W, SKETCH51_H)
    extrude(amount=-CUT_EXTRUDE36_DEPTH, mode=Mode.SUBTRACT)


with BuildPart() as body_3_2_1:
    add(body_3_2.part)

    # Split3
    split(bisect_by=Plane(origin=(0, -25, 0), x_dir=(1, 0, 0), z_dir=(0, 1, 0)), keep=Keep.TOP)


solid = body_3_2_1.part
